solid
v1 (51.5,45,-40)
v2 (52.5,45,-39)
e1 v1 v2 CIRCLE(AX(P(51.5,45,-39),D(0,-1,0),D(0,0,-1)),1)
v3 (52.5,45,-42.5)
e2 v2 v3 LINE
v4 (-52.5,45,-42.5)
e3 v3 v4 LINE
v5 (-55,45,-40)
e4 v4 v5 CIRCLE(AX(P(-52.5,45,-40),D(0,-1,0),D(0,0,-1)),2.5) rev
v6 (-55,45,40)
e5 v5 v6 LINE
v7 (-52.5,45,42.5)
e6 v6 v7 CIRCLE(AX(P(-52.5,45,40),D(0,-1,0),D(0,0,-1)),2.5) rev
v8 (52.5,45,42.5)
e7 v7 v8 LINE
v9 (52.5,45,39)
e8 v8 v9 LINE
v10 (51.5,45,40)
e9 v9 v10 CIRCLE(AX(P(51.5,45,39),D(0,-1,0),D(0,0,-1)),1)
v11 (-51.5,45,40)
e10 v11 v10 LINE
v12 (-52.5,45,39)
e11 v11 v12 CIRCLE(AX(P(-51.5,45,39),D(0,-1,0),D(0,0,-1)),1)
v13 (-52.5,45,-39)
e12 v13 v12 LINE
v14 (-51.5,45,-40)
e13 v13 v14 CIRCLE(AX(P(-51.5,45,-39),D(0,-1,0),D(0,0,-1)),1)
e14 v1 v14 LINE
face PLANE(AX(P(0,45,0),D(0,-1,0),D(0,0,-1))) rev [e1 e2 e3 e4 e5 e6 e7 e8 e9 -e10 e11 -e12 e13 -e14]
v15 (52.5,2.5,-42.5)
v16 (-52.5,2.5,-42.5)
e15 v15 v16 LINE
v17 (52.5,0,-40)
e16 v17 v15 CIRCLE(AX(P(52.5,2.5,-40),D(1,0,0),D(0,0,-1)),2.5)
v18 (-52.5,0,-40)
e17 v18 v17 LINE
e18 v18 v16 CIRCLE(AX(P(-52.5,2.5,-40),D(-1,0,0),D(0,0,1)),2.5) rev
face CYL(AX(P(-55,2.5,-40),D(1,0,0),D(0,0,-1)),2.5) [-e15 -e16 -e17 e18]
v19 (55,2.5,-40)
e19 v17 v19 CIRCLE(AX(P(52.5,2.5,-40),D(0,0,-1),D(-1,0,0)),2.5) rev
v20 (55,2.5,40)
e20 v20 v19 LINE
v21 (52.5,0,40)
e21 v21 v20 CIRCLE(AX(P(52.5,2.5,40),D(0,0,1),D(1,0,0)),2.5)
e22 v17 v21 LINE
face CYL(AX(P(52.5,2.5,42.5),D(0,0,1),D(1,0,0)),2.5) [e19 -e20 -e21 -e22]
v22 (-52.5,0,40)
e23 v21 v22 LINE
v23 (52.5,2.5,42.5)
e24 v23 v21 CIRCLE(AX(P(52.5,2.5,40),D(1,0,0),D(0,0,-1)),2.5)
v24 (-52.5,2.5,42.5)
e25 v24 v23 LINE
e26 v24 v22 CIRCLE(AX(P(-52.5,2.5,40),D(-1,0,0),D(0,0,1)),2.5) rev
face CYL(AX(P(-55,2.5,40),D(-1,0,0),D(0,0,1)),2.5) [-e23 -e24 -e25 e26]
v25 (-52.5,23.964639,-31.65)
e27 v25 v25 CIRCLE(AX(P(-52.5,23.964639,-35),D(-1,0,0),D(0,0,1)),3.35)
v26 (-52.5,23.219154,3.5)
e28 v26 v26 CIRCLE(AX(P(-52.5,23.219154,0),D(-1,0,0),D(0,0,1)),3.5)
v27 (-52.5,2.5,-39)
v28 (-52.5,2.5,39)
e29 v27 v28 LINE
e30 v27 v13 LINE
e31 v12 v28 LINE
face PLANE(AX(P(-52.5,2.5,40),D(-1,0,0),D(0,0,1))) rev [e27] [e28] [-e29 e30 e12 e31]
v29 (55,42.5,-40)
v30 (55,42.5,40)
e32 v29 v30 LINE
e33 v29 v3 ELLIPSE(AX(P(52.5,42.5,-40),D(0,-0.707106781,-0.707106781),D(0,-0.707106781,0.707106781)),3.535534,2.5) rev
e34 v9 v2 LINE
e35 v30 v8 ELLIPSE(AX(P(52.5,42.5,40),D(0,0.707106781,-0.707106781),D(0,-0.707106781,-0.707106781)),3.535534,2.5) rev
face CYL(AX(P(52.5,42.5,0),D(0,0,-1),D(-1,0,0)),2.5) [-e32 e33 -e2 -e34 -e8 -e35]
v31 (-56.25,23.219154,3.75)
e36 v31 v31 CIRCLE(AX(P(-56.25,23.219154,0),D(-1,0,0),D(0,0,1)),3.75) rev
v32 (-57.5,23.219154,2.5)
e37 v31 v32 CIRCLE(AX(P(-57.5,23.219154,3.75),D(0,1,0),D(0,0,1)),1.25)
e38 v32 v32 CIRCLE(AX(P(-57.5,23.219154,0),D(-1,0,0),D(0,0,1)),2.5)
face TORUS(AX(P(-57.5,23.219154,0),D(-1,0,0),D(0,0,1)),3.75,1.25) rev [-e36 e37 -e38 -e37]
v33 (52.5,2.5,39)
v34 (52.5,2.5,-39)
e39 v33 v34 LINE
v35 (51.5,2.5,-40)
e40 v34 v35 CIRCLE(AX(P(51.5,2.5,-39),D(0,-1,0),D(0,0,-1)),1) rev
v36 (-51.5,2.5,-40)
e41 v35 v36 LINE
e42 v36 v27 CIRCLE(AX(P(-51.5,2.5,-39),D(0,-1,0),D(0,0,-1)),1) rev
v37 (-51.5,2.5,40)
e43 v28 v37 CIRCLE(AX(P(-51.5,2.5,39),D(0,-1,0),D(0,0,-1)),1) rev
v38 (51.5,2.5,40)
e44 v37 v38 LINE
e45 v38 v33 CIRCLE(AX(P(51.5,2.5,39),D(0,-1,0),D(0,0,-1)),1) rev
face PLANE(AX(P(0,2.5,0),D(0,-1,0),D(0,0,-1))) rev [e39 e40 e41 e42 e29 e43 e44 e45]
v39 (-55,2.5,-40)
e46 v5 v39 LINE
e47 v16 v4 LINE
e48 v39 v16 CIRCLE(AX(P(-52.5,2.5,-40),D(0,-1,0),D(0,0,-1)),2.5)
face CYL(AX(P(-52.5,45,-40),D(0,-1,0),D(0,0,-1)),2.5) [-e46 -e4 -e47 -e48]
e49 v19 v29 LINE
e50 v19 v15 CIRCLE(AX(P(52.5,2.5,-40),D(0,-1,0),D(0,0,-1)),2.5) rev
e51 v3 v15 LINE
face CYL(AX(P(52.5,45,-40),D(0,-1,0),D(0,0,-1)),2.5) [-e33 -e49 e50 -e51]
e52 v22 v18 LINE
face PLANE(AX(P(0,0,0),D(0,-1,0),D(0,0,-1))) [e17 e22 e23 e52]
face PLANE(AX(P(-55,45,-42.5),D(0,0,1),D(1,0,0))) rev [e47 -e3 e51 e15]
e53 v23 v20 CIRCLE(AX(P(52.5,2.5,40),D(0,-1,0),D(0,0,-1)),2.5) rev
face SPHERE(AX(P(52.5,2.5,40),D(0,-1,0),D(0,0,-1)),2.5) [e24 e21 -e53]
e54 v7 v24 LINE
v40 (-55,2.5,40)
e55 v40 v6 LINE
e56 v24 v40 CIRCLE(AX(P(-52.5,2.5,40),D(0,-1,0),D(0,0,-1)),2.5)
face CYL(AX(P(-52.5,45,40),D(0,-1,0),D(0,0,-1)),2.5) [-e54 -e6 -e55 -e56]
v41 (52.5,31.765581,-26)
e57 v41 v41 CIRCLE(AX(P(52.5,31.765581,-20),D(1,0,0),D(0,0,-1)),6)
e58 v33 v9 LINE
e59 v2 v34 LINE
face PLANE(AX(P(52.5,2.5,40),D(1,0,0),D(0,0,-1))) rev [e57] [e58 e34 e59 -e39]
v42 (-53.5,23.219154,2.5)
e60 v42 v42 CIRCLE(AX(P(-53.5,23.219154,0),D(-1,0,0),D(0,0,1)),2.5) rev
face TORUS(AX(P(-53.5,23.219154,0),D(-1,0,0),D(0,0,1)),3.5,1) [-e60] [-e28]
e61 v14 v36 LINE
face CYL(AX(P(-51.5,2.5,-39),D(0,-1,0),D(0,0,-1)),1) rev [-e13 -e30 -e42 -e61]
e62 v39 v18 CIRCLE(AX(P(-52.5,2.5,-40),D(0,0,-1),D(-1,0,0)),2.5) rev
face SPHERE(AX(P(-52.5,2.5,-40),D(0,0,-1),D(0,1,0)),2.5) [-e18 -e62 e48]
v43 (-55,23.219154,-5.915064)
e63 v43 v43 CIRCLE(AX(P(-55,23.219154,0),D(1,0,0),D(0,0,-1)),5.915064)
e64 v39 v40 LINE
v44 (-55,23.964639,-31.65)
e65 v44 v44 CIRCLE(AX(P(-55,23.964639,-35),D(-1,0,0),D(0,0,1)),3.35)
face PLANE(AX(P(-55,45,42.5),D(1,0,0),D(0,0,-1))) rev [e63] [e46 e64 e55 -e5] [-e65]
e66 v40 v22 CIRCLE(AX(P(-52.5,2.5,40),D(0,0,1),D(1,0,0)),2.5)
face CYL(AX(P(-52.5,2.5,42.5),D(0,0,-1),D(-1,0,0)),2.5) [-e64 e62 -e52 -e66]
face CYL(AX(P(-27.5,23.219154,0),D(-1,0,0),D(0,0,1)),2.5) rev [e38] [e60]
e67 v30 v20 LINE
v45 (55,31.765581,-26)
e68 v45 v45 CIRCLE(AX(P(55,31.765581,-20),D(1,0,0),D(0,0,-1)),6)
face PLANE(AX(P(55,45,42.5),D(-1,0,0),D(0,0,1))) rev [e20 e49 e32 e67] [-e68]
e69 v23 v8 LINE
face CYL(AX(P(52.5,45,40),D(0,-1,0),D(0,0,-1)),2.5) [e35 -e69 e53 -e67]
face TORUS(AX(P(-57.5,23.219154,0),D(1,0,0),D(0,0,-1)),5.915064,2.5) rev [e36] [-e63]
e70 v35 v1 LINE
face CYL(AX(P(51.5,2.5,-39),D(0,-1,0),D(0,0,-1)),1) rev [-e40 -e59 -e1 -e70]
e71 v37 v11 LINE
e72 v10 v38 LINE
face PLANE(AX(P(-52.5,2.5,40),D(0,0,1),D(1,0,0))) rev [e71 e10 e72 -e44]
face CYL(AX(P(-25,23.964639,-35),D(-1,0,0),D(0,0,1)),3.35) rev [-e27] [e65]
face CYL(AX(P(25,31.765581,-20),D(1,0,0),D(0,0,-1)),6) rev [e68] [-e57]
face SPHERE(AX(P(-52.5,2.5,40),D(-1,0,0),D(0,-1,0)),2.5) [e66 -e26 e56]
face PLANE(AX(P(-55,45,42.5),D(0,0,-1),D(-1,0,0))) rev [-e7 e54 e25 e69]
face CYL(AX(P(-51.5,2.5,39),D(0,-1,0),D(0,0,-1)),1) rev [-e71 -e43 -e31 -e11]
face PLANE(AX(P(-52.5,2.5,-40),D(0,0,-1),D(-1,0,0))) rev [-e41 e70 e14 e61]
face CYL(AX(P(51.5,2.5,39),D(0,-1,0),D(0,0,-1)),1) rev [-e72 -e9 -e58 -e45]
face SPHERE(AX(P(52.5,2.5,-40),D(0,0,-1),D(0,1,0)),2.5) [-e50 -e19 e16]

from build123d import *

# Parameters (mm, degrees)
SKETCH1_W           = 110
SKETCH1_H           = 85
BOSS_EXTRUDE1_DEPTH = 45
SKETCH2_W           = 105
SKETCH2_H           = 80
CUT_EXTRUDE1_DEPTH  = 42.5
FILLET1_R           = 2.5
SKETCH3_R           = 3.75
BOSS_EXTRUDE3_DEPTH = 2.5
SKETCH5_R           = 2.5
CUT_EXTRUDE2_DEPTH  = 30
FILLET2_R           = 2.5
FILLET3_R           = 1
FILLET4_R           = 1
SKETCH12_R          = 6
CUT_EXTRUDE3_DEPTH  = 30
SKETCH13_R          = 3.35
CUT_EXTRUDE4_DEPTH  = 30


# Read off the part's stored shape, not the designer's step: Cut-Sweep1
# Some blends are built 0.0001 mm under size
with BuildPart() as part:
    # Sketch1 → Boss-Extrude1 (new body)
    with BuildSketch(Plane(origin=(0, 0, 0), x_dir=(1, 0, 0), z_dir=(0, 1, 0))):
        Rectangle(SKETCH1_W, SKETCH1_H)
    extrude(amount=BOSS_EXTRUDE1_DEPTH)

    # Sketch2 → Cut-Extrude1 (cut)
    with BuildSketch(Plane(origin=(0, 45, 0), x_dir=(1, 0, 0), z_dir=(0, 1, 0))):
        Rectangle(SKETCH2_W, SKETCH2_H)
    extrude(amount=-CUT_EXTRUDE1_DEPTH, mode=Mode.SUBTRACT)

    # Fillet1
    fillet1_edges = [part.edges().sort_by_distance(p)[0] for p in [
        (55, 45, 0),
        (0, 0, 42.5),
        (-55, 0, 0),
        (0, 0, -42.5),
        (55, 0, 0),
        (55, 22.5, 42.5),
        (-55, 22.5, 42.5),
        (-55, 22.5, -42.5),
        (55, 22.5, -42.5),
    ]]
    fillet(fillet1_edges, radius=FILLET1_R - 0.0001)  # a hair under: the kernel refuses the full size

    # Sketch3 → Boss-Extrude3 (add)
    with BuildSketch(Plane.ZY.offset(55)):
        with Locations(Location((0, 23.219153855, 0), (0, 0, 180))):
            Circle(SKETCH3_R)
    extrude(amount=BOSS_EXTRUDE3_DEPTH)

    # Sketch5 → Cut-Extrude2 (cut)
    with BuildSketch(Plane.ZY.offset(57.5)):
        with Locations((0, 23.219153855)):
            Circle(SKETCH5_R)
    extrude(amount=-CUT_EXTRUDE2_DEPTH, mode=Mode.SUBTRACT)

    # Cut-Sweep1 outline → Cut-Sweep1 (revolve, cut)
    with BuildSketch(Plane(origin=(0, 23.219153855, 0), x_dir=(0, 1, 0), z_dir=(0, 0, -1))):
        with BuildLine():
            ThreePointArc((3.75, -56.25), (2.866116524, -56.616116524), (2.5, -57.5))
            Line((2.5, -57.5), (3.75, -57.5))
            Line((3.75, -57.5), (3.75, -56.25))
        make_face()
    revolve(axis=Axis((0, 23.219153855, 0), (1, 0, 0)), mode=Mode.SUBTRACT)

    # Fillet2
    # the kernel refuses this fillet: 2.5 mm, written as the material it adds along each edge
    with BuildSketch(Plane(origin=(-55, 23.219153855, 0), x_dir=(0, 0, -1), z_dir=(0, 1, 0))) as fillet2_piece_1:
        with BuildLine():
            CenterArc((5.915063509, 2.5), FILLET2_R, 210, 60)
            Line((3.75, 1.25), (3.70669873, 1.225))
            ThreePointArc((3.70669873, 1.225), (3.7, 0.625), (3.7, 0))
            Line((3.7, 0), (3.75, -0.05))
            Line((3.75, -0.05), (5.915063509, -0.05))
            Line((5.915063509, -0.05), (5.915063509, 0))
        make_face()
    revolve(axis=Axis((-55, 23.219153855, 0), (-1, 0, 0)))

    # Fillet3
    fillet3_edges = [part.edges().sort_by_distance(p)[0] for p in [
        (-52.5, 23.219153855, -2.5),
    ]]
    fillet(fillet3_edges, radius=FILLET3_R)

    # Fillet4
    fillet4_edges = [part.edges().sort_by_distance(p)[0] for p in [
        (52.5, 23.75, -40),
        (52.5, 23.75, 40),
        (-52.5, 23.75, 40),
        (-52.5, 23.75, -40),
    ]]
    fillet(fillet4_edges, radius=FILLET4_R)

    # Sketch12 → Cut-Extrude3 (cut)
    with BuildSketch(Plane(origin=(55, 0, 0), x_dir=(0, 0, -1), z_dir=(1, 0, 0))):
        with Locations((20, 31.765581052)):
            Circle(SKETCH12_R)
    extrude(amount=-CUT_EXTRUDE3_DEPTH, mode=Mode.SUBTRACT)

    # Sketch13 → Cut-Extrude4 (cut)
    with BuildSketch(Plane.ZY.offset(55)):
        with Locations((-35, 23.964639065)):
            Circle(SKETCH13_R)
    extrude(amount=-CUT_EXTRUDE4_DEPTH, mode=Mode.SUBTRACT)


solid = part.part
